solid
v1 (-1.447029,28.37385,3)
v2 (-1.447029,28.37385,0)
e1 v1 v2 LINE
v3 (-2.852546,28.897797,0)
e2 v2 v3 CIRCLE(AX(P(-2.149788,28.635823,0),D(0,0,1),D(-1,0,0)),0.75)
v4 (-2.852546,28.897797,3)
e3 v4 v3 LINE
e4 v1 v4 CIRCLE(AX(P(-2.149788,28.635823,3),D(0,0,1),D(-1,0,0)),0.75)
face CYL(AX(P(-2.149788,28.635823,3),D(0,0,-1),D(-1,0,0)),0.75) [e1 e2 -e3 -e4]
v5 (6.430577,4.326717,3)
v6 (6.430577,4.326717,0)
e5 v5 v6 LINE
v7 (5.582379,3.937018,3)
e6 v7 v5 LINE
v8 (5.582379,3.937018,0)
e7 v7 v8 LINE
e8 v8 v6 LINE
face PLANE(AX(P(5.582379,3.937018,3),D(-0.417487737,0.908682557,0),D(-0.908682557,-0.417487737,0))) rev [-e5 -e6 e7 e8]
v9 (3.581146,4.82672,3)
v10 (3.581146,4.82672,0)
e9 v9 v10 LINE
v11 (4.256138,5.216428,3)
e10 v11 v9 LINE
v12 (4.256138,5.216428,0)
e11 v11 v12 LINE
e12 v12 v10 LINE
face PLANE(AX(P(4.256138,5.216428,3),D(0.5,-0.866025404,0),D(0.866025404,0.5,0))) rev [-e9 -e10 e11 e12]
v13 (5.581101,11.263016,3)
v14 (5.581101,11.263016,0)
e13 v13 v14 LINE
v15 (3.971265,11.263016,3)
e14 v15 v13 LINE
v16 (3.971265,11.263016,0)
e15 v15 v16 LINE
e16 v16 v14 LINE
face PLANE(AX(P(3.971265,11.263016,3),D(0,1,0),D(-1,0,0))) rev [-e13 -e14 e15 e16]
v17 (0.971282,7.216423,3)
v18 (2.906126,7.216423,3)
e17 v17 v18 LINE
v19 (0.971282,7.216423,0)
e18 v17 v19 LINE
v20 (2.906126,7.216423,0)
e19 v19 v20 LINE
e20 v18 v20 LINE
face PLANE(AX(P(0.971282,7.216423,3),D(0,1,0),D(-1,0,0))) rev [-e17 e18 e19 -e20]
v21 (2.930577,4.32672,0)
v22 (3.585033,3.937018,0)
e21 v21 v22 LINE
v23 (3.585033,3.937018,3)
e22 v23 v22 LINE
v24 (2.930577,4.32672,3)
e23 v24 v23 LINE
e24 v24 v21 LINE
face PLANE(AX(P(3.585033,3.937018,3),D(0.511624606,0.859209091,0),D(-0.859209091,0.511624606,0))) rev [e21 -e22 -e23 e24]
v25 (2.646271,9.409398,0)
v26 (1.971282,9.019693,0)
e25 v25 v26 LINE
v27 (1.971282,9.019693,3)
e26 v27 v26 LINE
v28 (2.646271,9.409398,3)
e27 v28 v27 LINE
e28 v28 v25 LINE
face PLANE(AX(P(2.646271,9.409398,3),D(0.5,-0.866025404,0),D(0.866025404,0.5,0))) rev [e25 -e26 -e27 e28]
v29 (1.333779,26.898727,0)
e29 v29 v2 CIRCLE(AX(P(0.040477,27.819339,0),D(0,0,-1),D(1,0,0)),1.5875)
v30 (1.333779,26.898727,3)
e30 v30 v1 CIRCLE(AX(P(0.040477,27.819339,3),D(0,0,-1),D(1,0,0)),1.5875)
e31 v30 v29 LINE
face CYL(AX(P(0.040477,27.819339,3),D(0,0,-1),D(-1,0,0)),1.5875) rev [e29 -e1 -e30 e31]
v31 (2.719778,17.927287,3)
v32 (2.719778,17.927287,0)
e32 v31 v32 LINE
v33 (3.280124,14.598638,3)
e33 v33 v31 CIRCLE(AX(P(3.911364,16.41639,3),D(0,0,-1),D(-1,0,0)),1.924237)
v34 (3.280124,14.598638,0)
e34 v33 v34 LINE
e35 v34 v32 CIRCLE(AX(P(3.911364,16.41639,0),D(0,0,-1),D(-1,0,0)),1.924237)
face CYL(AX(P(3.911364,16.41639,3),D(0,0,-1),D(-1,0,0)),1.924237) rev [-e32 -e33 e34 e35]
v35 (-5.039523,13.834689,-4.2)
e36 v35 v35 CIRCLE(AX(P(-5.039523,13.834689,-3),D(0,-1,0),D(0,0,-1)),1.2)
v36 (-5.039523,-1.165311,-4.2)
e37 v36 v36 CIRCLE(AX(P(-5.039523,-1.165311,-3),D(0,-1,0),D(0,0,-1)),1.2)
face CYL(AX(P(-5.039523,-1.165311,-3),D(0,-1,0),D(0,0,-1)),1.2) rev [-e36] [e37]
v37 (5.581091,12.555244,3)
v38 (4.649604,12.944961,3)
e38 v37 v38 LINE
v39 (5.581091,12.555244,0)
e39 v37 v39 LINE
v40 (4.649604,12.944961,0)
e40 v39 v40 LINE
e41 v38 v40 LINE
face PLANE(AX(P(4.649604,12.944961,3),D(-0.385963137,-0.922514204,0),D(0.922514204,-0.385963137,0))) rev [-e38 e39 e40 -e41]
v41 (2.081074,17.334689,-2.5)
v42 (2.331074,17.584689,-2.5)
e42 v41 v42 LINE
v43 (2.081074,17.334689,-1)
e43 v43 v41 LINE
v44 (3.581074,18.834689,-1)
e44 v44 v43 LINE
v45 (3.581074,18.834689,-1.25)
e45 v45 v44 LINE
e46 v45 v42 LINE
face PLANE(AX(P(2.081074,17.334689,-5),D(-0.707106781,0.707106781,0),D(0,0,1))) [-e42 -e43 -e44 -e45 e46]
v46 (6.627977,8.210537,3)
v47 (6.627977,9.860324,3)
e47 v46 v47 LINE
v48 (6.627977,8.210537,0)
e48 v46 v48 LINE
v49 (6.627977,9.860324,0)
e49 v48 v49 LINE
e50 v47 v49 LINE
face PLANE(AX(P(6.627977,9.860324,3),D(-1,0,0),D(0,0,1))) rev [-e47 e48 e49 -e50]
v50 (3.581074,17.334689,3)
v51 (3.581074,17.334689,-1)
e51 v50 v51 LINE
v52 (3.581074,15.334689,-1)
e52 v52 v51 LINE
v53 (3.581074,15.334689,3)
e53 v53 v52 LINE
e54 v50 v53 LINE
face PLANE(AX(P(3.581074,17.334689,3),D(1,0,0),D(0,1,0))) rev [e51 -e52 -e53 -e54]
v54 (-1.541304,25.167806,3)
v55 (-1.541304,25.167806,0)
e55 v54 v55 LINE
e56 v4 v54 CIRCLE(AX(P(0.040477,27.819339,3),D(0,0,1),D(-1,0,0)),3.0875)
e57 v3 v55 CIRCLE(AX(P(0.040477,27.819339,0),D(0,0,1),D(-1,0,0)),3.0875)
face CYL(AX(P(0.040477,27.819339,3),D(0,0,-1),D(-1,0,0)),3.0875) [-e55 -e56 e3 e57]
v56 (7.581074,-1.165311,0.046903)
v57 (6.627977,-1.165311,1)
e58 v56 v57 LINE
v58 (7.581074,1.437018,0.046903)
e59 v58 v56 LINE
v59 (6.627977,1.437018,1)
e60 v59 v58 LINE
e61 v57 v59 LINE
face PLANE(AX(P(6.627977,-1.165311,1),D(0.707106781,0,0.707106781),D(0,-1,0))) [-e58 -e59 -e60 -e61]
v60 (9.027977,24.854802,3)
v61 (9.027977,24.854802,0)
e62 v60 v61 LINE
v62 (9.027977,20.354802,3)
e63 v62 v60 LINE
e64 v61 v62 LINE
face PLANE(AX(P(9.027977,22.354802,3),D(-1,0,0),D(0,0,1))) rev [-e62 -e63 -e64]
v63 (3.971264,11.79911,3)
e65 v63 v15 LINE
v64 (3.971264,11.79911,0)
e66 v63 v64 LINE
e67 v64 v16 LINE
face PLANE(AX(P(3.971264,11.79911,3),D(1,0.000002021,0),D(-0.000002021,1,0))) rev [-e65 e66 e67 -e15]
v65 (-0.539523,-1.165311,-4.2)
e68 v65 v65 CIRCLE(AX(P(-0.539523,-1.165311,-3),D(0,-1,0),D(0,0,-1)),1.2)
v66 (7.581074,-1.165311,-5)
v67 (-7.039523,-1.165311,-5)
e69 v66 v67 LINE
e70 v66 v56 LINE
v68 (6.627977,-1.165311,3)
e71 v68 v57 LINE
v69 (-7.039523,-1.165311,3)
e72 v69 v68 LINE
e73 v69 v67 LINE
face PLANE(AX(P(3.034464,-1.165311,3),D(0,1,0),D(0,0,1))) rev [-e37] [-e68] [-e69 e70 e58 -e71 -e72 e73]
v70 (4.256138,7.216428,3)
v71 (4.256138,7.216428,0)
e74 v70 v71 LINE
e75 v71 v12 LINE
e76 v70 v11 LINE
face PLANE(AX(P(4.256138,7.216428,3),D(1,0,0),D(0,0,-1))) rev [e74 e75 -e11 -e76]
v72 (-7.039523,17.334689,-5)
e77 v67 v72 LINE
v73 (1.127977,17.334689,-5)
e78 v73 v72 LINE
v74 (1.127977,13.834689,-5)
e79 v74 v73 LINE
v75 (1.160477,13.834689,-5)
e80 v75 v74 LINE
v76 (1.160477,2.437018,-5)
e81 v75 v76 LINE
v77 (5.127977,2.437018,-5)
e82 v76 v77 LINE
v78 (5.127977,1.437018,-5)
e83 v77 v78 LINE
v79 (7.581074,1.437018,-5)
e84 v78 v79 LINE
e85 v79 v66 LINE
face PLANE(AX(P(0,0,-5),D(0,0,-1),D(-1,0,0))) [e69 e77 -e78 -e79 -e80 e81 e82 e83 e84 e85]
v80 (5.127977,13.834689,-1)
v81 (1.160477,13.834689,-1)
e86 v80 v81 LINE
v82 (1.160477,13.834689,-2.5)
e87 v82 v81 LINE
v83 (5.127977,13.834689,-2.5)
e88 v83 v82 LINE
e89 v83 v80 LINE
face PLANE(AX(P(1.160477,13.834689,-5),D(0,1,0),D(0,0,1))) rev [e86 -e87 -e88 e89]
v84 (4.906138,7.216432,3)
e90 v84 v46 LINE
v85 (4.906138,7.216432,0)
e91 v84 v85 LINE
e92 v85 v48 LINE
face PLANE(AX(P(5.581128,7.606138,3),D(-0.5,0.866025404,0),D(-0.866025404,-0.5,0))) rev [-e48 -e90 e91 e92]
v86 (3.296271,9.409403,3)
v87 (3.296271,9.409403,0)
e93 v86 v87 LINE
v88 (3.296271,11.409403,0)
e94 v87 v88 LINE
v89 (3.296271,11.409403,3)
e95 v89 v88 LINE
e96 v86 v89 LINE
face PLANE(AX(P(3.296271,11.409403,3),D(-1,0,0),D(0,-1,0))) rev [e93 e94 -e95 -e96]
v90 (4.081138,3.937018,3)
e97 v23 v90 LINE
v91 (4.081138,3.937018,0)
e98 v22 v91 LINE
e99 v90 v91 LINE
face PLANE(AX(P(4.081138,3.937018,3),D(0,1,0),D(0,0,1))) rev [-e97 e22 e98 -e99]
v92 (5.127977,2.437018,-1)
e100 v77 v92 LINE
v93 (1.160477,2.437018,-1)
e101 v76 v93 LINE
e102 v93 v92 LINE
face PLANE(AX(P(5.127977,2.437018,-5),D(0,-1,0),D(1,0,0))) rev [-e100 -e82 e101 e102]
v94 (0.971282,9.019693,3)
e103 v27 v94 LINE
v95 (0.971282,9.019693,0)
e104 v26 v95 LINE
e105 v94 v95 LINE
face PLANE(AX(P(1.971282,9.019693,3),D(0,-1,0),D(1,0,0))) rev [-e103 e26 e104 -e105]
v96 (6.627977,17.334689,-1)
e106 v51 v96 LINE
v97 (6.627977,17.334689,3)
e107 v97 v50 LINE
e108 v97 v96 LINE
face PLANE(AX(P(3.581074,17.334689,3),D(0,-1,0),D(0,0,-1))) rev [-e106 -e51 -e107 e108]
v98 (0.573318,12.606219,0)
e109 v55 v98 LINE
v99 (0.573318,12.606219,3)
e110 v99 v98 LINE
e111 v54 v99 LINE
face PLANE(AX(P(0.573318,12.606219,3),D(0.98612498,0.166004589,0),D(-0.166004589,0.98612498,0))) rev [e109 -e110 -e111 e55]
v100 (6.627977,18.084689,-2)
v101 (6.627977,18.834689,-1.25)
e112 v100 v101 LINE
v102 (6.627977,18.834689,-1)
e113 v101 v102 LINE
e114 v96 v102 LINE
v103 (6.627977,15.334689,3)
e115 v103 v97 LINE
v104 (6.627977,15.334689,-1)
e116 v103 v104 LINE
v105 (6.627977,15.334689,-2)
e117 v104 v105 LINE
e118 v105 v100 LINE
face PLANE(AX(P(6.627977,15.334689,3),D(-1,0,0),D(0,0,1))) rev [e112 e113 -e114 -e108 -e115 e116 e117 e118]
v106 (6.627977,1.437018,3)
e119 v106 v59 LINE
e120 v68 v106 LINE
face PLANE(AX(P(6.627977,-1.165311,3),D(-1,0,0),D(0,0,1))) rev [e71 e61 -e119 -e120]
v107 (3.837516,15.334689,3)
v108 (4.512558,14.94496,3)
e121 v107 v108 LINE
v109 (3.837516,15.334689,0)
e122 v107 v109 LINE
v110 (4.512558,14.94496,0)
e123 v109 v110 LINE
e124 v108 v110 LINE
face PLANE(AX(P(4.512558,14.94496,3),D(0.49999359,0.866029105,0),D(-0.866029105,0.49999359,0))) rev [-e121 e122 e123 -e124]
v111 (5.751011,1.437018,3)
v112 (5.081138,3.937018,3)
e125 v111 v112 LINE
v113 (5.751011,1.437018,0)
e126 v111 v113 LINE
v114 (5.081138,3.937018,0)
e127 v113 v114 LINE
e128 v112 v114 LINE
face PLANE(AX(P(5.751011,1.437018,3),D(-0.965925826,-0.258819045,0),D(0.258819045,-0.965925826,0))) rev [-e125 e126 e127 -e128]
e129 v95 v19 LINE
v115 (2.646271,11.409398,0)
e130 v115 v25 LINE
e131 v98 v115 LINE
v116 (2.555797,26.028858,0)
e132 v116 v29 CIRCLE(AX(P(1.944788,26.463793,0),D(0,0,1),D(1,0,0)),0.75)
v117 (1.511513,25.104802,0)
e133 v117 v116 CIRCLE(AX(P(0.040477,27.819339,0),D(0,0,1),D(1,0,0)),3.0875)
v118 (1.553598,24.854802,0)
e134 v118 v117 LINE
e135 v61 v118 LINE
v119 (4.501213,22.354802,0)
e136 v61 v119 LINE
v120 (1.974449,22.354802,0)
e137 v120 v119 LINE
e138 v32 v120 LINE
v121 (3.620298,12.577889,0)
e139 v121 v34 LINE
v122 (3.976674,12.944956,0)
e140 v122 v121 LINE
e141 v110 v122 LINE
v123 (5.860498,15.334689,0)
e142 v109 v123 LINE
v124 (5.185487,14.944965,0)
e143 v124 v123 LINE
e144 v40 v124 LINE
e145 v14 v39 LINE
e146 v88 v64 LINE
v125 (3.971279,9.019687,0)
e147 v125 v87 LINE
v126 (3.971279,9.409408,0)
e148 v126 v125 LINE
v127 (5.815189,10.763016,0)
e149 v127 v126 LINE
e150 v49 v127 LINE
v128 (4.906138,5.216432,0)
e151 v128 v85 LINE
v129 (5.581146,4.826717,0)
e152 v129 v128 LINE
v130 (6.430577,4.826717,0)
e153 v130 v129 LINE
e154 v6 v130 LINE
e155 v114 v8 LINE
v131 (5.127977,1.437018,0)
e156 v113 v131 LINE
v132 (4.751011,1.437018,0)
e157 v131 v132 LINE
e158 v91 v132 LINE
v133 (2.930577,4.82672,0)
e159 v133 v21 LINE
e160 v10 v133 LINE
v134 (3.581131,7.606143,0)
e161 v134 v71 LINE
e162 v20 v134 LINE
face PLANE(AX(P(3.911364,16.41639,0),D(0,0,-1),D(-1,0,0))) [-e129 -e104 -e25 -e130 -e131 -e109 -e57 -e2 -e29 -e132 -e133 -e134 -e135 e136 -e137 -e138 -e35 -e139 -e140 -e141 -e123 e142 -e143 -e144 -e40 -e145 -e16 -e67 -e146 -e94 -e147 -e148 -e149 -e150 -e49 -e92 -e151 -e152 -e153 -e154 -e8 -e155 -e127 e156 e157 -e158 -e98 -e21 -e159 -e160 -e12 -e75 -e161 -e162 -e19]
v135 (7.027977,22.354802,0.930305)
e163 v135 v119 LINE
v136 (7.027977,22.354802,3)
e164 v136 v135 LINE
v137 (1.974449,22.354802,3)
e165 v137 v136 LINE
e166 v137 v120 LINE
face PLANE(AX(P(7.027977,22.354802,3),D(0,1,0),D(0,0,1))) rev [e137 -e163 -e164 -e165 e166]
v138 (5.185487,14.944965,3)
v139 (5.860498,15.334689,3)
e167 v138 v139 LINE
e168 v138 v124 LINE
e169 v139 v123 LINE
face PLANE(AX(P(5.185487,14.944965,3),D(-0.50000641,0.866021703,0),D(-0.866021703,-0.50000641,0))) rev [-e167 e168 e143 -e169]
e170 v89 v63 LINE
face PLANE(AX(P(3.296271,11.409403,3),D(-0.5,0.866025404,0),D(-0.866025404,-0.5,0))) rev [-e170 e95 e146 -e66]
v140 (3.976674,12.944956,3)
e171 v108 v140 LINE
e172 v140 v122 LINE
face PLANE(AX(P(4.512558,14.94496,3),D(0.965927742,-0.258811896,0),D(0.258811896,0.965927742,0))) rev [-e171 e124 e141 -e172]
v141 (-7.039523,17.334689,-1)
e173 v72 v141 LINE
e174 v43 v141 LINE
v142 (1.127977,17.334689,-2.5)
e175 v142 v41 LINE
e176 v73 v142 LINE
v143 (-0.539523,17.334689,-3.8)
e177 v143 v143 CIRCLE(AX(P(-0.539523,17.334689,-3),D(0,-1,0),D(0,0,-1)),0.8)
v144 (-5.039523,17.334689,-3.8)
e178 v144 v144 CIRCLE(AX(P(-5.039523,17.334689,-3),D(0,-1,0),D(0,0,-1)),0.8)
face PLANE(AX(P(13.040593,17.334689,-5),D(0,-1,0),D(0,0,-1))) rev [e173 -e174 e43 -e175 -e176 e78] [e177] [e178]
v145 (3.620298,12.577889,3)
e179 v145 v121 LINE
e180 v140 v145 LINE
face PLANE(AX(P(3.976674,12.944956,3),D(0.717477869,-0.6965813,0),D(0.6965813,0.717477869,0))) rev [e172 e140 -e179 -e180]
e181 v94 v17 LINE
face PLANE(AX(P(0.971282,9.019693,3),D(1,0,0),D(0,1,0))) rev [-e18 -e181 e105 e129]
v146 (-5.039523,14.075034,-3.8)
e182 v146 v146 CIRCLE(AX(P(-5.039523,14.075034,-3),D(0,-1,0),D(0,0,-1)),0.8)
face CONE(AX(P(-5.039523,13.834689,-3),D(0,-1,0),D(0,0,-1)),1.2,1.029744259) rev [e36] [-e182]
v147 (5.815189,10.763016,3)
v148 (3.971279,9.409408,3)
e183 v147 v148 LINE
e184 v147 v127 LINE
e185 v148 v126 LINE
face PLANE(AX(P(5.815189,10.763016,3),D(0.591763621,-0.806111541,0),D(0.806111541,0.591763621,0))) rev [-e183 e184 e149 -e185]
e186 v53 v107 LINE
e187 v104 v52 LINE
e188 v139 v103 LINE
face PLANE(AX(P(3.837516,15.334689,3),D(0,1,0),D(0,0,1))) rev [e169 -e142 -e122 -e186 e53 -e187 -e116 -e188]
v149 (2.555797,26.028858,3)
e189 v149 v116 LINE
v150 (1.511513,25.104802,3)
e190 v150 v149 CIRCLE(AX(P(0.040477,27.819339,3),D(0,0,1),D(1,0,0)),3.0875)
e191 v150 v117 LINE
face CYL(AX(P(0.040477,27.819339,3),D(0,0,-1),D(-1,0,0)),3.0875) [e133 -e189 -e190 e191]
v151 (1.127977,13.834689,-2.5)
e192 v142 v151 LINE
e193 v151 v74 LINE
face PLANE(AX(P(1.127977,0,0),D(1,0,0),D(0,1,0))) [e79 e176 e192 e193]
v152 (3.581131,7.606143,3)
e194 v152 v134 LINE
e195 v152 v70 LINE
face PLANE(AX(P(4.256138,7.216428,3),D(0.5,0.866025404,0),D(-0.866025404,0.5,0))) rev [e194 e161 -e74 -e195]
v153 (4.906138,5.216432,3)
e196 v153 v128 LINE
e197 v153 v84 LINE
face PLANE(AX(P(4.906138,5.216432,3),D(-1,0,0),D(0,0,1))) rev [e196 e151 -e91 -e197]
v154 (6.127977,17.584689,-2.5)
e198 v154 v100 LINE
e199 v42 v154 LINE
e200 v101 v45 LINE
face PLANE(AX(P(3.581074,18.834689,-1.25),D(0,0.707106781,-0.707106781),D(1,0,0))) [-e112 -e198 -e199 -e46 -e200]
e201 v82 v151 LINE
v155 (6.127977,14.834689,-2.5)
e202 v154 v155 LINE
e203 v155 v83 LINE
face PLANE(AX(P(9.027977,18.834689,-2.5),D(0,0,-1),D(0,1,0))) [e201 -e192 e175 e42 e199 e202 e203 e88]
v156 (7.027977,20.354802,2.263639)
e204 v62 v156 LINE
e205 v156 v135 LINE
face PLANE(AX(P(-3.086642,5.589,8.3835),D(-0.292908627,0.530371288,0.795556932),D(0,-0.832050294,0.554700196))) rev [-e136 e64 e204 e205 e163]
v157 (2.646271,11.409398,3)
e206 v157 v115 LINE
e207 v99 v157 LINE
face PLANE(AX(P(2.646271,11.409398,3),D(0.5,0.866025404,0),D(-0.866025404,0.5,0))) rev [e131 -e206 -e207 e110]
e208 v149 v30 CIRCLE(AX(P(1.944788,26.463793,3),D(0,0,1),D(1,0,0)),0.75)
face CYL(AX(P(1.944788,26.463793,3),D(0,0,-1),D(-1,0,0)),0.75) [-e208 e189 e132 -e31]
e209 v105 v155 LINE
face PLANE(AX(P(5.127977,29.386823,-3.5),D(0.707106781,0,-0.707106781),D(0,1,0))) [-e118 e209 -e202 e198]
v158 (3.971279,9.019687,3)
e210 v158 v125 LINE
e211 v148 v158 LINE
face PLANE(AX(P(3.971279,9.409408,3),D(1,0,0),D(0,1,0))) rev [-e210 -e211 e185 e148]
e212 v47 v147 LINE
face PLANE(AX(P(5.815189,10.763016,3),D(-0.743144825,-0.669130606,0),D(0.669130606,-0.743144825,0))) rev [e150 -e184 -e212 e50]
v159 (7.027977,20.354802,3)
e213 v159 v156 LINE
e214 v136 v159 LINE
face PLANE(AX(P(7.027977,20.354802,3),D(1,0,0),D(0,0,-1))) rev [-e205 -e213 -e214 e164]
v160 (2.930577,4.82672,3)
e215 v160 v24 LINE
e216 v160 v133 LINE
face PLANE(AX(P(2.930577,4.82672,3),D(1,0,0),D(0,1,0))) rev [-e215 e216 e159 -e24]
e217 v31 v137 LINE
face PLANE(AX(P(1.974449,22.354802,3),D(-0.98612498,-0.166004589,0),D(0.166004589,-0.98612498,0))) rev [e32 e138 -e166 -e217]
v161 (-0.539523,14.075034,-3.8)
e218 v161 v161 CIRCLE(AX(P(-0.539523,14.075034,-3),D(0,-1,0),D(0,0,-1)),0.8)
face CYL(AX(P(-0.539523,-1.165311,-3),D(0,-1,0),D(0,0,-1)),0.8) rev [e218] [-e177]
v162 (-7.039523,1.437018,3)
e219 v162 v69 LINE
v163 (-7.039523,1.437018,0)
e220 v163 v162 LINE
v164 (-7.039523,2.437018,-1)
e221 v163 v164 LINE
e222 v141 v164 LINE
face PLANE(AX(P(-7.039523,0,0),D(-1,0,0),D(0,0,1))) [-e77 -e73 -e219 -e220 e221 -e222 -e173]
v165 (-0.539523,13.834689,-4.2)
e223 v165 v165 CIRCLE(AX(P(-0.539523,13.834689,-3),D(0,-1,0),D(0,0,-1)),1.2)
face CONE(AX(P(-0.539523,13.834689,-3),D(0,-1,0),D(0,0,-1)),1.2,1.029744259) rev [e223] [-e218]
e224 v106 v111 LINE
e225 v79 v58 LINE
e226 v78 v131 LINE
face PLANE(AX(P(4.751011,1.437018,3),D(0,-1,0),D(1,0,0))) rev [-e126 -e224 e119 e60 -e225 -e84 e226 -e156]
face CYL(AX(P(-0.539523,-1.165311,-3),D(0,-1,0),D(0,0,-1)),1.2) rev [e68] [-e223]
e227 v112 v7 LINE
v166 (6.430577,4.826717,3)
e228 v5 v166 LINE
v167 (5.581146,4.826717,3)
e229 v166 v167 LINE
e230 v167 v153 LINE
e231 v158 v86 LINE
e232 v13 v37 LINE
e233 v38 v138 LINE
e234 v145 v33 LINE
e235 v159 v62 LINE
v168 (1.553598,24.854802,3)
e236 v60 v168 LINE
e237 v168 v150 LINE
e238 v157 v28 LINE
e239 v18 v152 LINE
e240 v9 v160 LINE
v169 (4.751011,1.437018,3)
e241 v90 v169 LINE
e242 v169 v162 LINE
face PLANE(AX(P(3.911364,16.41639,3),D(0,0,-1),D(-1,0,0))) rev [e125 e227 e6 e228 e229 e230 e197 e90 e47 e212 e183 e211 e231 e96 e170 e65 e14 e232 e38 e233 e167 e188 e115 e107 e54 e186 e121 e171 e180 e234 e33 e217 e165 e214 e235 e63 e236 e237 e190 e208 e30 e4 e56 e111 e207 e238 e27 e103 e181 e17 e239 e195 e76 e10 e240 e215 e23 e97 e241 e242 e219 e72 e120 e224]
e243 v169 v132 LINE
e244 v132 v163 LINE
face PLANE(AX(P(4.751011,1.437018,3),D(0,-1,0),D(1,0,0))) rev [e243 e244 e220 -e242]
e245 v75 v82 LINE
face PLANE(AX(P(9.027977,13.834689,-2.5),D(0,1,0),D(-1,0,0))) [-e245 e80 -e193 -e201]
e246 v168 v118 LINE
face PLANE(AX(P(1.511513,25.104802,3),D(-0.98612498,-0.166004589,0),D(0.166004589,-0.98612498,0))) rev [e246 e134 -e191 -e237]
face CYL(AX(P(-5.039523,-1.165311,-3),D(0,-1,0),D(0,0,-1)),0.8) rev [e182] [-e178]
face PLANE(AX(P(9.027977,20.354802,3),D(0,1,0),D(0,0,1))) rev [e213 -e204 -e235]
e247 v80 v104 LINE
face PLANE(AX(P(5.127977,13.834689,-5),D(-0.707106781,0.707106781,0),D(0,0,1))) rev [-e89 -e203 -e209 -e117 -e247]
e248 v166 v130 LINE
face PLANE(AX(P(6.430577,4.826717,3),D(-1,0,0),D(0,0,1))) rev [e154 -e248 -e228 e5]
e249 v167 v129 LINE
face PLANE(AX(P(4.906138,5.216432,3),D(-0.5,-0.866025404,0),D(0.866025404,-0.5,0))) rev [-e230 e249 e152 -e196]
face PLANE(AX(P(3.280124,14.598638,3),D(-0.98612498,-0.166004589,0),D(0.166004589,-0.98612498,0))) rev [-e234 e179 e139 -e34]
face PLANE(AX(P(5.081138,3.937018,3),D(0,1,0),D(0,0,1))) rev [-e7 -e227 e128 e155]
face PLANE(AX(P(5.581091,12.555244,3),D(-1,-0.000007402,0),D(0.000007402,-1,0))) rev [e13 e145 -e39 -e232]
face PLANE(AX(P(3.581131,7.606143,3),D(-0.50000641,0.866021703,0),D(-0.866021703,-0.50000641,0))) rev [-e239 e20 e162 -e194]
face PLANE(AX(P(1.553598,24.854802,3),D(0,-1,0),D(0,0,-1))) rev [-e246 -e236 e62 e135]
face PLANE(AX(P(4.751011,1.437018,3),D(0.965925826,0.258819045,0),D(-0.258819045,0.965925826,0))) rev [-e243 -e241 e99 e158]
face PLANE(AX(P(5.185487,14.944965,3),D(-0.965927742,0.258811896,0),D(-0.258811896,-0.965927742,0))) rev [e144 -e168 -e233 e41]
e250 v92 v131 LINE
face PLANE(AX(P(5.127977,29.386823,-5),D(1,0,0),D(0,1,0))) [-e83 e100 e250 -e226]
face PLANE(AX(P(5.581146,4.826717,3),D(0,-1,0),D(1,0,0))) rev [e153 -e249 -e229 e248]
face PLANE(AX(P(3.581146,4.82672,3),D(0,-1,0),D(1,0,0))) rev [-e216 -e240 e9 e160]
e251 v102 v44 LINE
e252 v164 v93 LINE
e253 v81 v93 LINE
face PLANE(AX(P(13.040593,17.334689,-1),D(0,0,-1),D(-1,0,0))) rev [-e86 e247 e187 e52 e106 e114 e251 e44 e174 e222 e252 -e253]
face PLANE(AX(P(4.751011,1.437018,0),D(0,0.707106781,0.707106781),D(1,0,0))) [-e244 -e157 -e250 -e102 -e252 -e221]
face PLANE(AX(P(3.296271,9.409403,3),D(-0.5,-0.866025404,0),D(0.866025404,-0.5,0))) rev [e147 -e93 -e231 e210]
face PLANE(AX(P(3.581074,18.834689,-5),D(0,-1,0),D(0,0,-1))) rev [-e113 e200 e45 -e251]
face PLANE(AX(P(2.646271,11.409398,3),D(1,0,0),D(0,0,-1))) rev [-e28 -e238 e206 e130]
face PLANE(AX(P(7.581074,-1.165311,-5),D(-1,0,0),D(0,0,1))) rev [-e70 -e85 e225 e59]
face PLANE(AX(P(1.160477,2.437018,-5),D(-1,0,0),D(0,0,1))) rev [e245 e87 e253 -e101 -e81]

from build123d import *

# Parameters (mm, degrees)
BOSS_SWITCH_BODY_DEPTH                    = 3
SKETCH1_W                                 = 4
SKETCH1_H                                 = 3.5
BOSS_FLANGE_WIDTH_DEPTH                   = 5
BOSS_FLANGE_HEIGHT_REACH                  = 35.863
SKETCH2_W                                 = 4
SKETCH2_H                                 = 2
SKETCH2_W_2                               = 8
SKETCH2_H_2                               = 2.602328973
CUT_UP_TO_DOWN_DERAILLEUR_CLEARANCE_REACH = 21.462
SKETCH10_W                                = 2.453096586
SKETCH10_H                                = 3
SKETCH17_W                                = 12.1675
SKETCH17_H                                = 4
BOSS_FLANGE_SUPPORT_DEPTH                 = 13.897671027
TAP_DRILL_FOR_M2X0_4_TAP1_D               = 1.6
M2_CLEARANCE_HOLE2_D                      = 2.4
M2_CLEARANCE_HOLE2_DEPTH                  = 15
M2_CLEARANCE_HOLE2_TIP                    = 0.721032743
CHAMFER_FLANGE_SUPPORT_SIZE               = 1.5
CHAMFER_FLANGE_SUPPORT_2_SIZE             = 1.5
CHAMFER_FLANGE_SUPPORT_3_SIZE             = 1
SKETCH23_W                                = 3.9675
SKETCH23_H                                = 11.397671027
CUT_GAP_FOR_PRINTING_DEPTH                = 32.000499688
SKETCH25_W                                = 0.953096586
SKETCH25_H                                = 3.5
CUT_DERAILLEUR_CLEARANCE_DEPTH            = 32.145320369
CHAMFER8_SIZE                             = 1
CUT_UP_TO_DOWN_CANTILEVER_SLOPE_REACH     = 31.869
SKETCH26_W                                = 12.477246204
SKETCH26_H                                = 5.771077126
CUT_WIDE_DERAILLEUR_CLEARANCE_DEPTH       = 33.195879702
CUT_WIDE_DERAILLEUR_CLEARANCE_DEPTH_BACK  = 4
SKETCH27_W                                = 2.5
SKETCH27_H                                = 5.000000046
CHAMFER9_SIZE                             = 1.25
SKETCH28_W                                = 3.046903414
SKETCH28_H                                = 1.5
CUT_EXTRUDE1_DEPTH                        = 1


# Some blends are built 0.0001 mm under size
with BuildPart() as part:
    # Sketch-SwitchBossUp → Boss-Switch Body (new body)
    with BuildSketch(Plane.XY):
        with BuildLine():
            Line((5.581091201, 12.55524379), (5.581100766, 11.263016279))
            Line((5.581100766, 11.263016279), (3.971265023, 11.263016279))
            Line((3.971265023, 11.263016279), (3.97126394, 11.79911022))
            Line((3.97126394, 11.79911022), (3.296271341, 11.409403061))
            Line((3.296271341, 11.409403061), (3.296271341, 9.409403061))
            Line((3.296271341, 9.409403061), (3.971278743, 9.019687356))
            Line((3.971278743, 9.019687356), (3.971278743, 9.409408058))
            Line((3.971278743, 9.409408058), (5.815189336, 10.763016279))
            Line((5.815189336, 10.763016279), (6.627976927, 9.860324207))
            Line((6.627976927, 9.860324207), (6.627976927, 8.210536505))
            Line((6.627976927, 8.210536505), (5.581127833, 7.606137899))
            Line((5.581127833, 7.606137899), (4.906138119, 7.216432406))
            Line((4.906138119, 7.216432406), (4.906138119, 5.216432406))
            Line((4.906138119, 5.216432406), (5.58114552, 4.826716701))
            Line((5.58114552, 4.826716701), (6.430577026, 4.826716701))
            Line((6.430577026, 4.826716701), (6.430577026, 4.326716701))
            Line((6.430577026, 4.326716701), (5.582379266, 3.937018274))
            Line((5.582379266, 3.937018274), (5.081138119, 3.937018274))
            Line((5.081138119, 3.937018274), (5.7510111, 1.437018274))
            Line((5.7510111, 1.437018274), (6.627976927, 1.437018274))
            Line((6.627976927, 1.437018274), (6.627976927, -1.165310699))
            Line((6.627976927, -1.165310699), (3.034464198, -1.165310699))
            Line((3.034464198, -1.165310699), (3.034464198, 1.437018274))
            Line((3.034464198, 1.437018274), (4.7510111, 1.437018274))
            Line((4.7510111, 1.437018274), (4.081138119, 3.937018274))
            Line((4.081138119, 3.937018274), (3.585032728, 3.937018274))
            Line((3.585032728, 3.937018274), (2.930577026, 4.326720436))
            Line((2.930577026, 4.326720436), (2.930577026, 4.826720436))
            Line((2.930577026, 4.826720436), (3.58114552, 4.826720436))
            Line((3.58114552, 4.826720436), (4.256138119, 5.216427595))
            Line((4.256138119, 5.216427595), (4.256138119, 7.216427595))
            Line((4.256138119, 7.216427595), (3.581130717, 7.6061433))
            Line((3.581130717, 7.6061433), (2.9061262, 7.216422599))
            Line((2.9061262, 7.216422599), (0.971281627, 7.216422599))
            Line((0.971281627, 7.216422599), (0.971281627, 9.019692757))
            Line((0.971281627, 9.019692757), (1.971281627, 9.019692757))
            Line((1.971281627, 9.019692757), (2.646271341, 9.40939825))
            Line((2.646271341, 9.40939825), (2.646271341, 11.40939825))
            Line((2.646271341, 11.40939825), (1.696557212, 11.957715958))
            Line((1.696557212, 11.957715958), (0.573317845, 12.60621851))
            Line((0.573317845, 12.60621851), (-1.541303694, 25.167805745))
            ThreePointArc((-1.541303694, 25.167805745), (-2.872284003, 26.795385437), (-2.852546321, 28.897797067))
            ThreePointArc((-2.852546321, 28.897797067), (-1.887813913, 29.338582026), (-1.447028953, 28.373849618))
            ThreePointArc((-1.447028953, 28.373849618), (-0.703448682, 26.416936722), (1.333779254, 26.898727173))
            ThreePointArc((1.333779254, 26.898727173), (2.379722745, 27.074801628), (2.555797201, 26.028858137))
            ThreePointArc((2.555797201, 26.028858137), (2.086504637, 25.507104397), (1.511513111, 25.104801997))
            Line((1.511513111, 25.104801997), (1.553598189, 24.854801997))
            Line((1.553598189, 24.854801997), (9.027976927, 24.854801997))
            Line((9.027976927, 24.854801997), (9.027976927, 22.354801997))
            Line((9.027976927, 22.354801997), (9.027976927, 20.354801997))
            Line((9.027976927, 20.354801997), (7.027976927, 20.354801997))
            Line((7.027976927, 20.354801997), (7.027976927, 22.354801997))
            Line((7.027976927, 22.354801997), (1.974448974, 22.354801997))
            Line((1.974448974, 22.354801997), (2.719778232, 17.927287042))
            ThreePointArc((2.719778232, 17.927287042), (2.013826204, 16.096957693), (3.280124137, 14.598637521))
            Line((3.280124137, 14.598637521), (3.620297651, 12.577888564))
            Line((3.620297651, 12.577888564), (3.976674365, 12.944956135))
            Line((3.976674365, 12.944956135), (4.512557947, 14.944960101))
            Line((4.512557947, 14.944960101), (3.837515632, 15.334689301))
            Line((3.837515632, 15.334689301), (3.581073513, 15.334689301))
            Line((3.581073513, 15.334689301), (3.581073513, 17.334689301))
            Line((3.581073513, 17.334689301), (5.725580434, 17.334689301))
            Line((5.725580434, 17.334689301), (6.627976927, 17.334689301))
            Line((6.627976927, 17.334689301), (6.627976927, 15.334689301))
            Line((6.627976927, 15.334689301), (5.860498075, 15.334689301))
            Line((5.860498075, 15.334689301), (5.185487464, 14.944965082))
            Line((5.185487464, 14.944965082), (4.649603883, 12.944961115))
            Line((4.649603883, 12.944961115), (5.581091201, 12.55524379))
        make_face()
    extrude(amount=BOSS_SWITCH_BODY_DEPTH)

    # Sketch1 → Boss-Flange Width (add)
    with BuildSketch(Plane(origin=(0, 0, 0), x_dir=(-1, 0, 0), z_dir=(0, 0, -1))):
        Polygon((-7.581073513, -1.165310699), (0.412170615, -1.165310699), (0.412170615, 1.437018274), (-3.034464198, 1.437018274), (-4.7510111, 1.437018274), (-5.7510111, 1.437018274), (-6.627976927, 1.437018274), (-7.581073513, 1.437018274), align=None)
        with Locations((-5.581073513, 17.084689301)):
            Rectangle(SKETCH1_W, SKETCH1_H)
    extrude(amount=BOSS_FLANGE_WIDTH_DEPTH)

    # Sketch2 → Boss-Flange Height (add, up to next)
    with BuildSketch(Plane(origin=(-7.039523073, 0, 0), x_dir=(0, 0, -1), z_dir=(1, 0, 0)), mode=Mode.PRIVATE) as boss_flange_height_sk1:
        with Locations((3, 16.334689301)):
            Rectangle(SKETCH2_W, SKETCH2_H)
    boss_flange_height_tool1 = extrude(boss_flange_height_sk1.sketch, amount=BOSS_FLANGE_HEIGHT_REACH, mode=Mode.PRIVATE) - part.part
    # Sketch2 → Boss-Flange Height (add, up to next)
    with BuildSketch(Plane(origin=(-7.039523073, 0, 0), x_dir=(0, 0, -1), z_dir=(1, 0, 0)), mode=Mode.PRIVATE) as boss_flange_height_sk2:
        with Locations((1, 0.135853787)):
            Rectangle(SKETCH2_W_2, SKETCH2_H_2)
    boss_flange_height_tool2 = extrude(boss_flange_height_sk2.sketch, amount=BOSS_FLANGE_HEIGHT_REACH, mode=Mode.PRIVATE) - part.part
    add(boss_flange_height_tool1.solids().sort_by_distance((-7.039523, 16.334689, -3))[0])
    add(boss_flange_height_tool2.solids().sort_by_distance((-7.039523, 0.135854, -1))[0])

    # Sketch10 → Cut-Up-To-Down Derailleur Clearance (cut, up to next)
    with BuildSketch(Plane(origin=(0, 15.334689301, 0), x_dir=(1, 0, 0), z_dir=(0, 1, 0)), mode=Mode.PRIVATE) as cut_up_to_down_derailleur_clearance_sk1:
        with Locations((6.35452522, 3.5)):
            Rectangle(SKETCH10_W, SKETCH10_H)
    cut_up_to_down_derailleur_clearance_tool1 = extrude(cut_up_to_down_derailleur_clearance_sk1.sketch, amount=CUT_UP_TO_DOWN_DERAILLEUR_CLEARANCE_REACH, mode=Mode.PRIVATE) & part.part
    add(cut_up_to_down_derailleur_clearance_tool1.solids().sort_by_distance((6.354525, 15.334689, -3.5))[0], mode=Mode.SUBTRACT)

    # Sketch17 → Boss-Flange Support (add)
    with BuildSketch(Plane.XZ.offset(-15.334689301)):
        with Locations((-0.955773073, -3)):
            Rectangle(SKETCH17_W, SKETCH17_H)
    extrude(amount=BOSS_FLANGE_SUPPORT_DEPTH)

    # Tap Drill for M2x0.4 Tap1 (through all)
    with Locations(Plane(origin=(0, -1.165310699, 0), x_dir=(-1, 0, 0), z_dir=(0, -1, 0))):
        with Locations((5.039523073, 3), (0.539523073, 3)):
            Hole(TAP_DRILL_FOR_M2X0_4_TAP1_D / 2)

    # M2 Clearance Hole2
    with Locations(Plane.XZ.offset(1.165310699)):
        with Locations((-5.039523073, -3), (-0.539523073, -3)):
            Hole(M2_CLEARANCE_HOLE2_D / 2, depth=M2_CLEARANCE_HOLE2_DEPTH)
            with Locations((0, 0, -(M2_CLEARANCE_HOLE2_DEPTH + M2_CLEARANCE_HOLE2_TIP / 2))):  # 118° drill point
                Cone(0, M2_CLEARANCE_HOLE2_D / 2, M2_CLEARANCE_HOLE2_TIP, mode=Mode.SUBTRACT)

    # Chamfer-Flange Support
    chamfer_flange_support_edges = [part.edges().sort_by_distance(p)[0] for p in [
        (3.581073513, 17.334689301, -3),
    ]]
    chamfer(chamfer_flange_support_edges, length=CHAMFER_FLANGE_SUPPORT_SIZE - 0.0001)  # a hair under: the kernel refuses the full size

    # Chamfer-Flange Support 2
    chamfer_flange_support_2_edges = [part.edges().sort_by_distance(p)[0] for p in [
        (5.127976927, 17.084689301, -2),
        (5.127976927, 15.334689301, -1.5),
    ]]
    chamfer(chamfer_flange_support_2_edges, length=CHAMFER_FLANGE_SUPPORT_2_SIZE)

    # Chamfer-Flange Support 3
    chamfer_flange_support_3_edges = [part.edges().sort_by_distance(p)[0] for p in [
        (-0.955773073, 1.437018274, -1),
    ]]
    chamfer(chamfer_flange_support_3_edges, length=CHAMFER_FLANGE_SUPPORT_3_SIZE - 0.0001)  # a hair under: the kernel refuses the full size

    # Sketch23 → Cut-Gap for Printing (cut, through all)
    with BuildSketch(Plane.XY.offset(-1)):
        with Locations((3.144226927, 8.135853788)):
            Rectangle(SKETCH23_W, SKETCH23_H)
    extrude(amount=-CUT_GAP_FOR_PRINTING_DEPTH, mode=Mode.SUBTRACT)

    # Sketch25 → Cut-Derailleur Clearance (cut, through all)
    with BuildSketch(Plane.XY):
        with Locations((7.10452522, 17.084689301)):
            Rectangle(SKETCH25_W, SKETCH25_H)
    extrude(amount=-CUT_DERAILLEUR_CLEARANCE_DEPTH, mode=Mode.SUBTRACT)

    # Chamfer8
    # the kernel refuses this chamfer: 1 mm, written as the material it adds along each edge
    with BuildSketch(Plane(origin=(6.627976927, 1.437018274, 0), x_dir=(0.9996219169112968, 0, -0.027495876610586365), z_dir=(0, -1, 0))) as chamfer8_piece_1_section:
        Polygon((CHAMFER8_SIZE * 0.999621916911, CHAMFER8_SIZE * 0.0274958766106), (-CHAMFER8_SIZE * 0.0274958766106, CHAMFER8_SIZE * 0.999621916911), (0, 0), align=None)
    chamfer8_piece_1 = extrude(amount=2.602328973, mode=Mode.PRIVATE)
    chamfer8_piece_1 = split(chamfer8_piece_1, bisect_by=Plane(origin=(7.581073513, 0.135853788, 0.332375145), z_dir=(-1, 0, 0)), keep=Keep.TOP, mode=Mode.PRIVATE)
    add(chamfer8_piece_1)

    # Sketch26 → Cut-Up-to-Down Cantilever Slope (cut, up to next)
    with BuildSketch(Plane(origin=(-3.086642121, 5.589000146, 8.383500218), x_dir=(-0.9561404375276108, -0.1624764728289173, -0.24371470924337582), z_dir=(0.2929086269205964, -0.5303712883154423, -0.795556932473163)), mode=Mode.PRIVATE) as cut_up_to_down_cantilever_slope_sk1:
        with Locations((-13.791615152, 17.794906754)):
            Rectangle(SKETCH26_W, SKETCH26_H)
    cut_up_to_down_cantilever_slope_tool1 = extrude(cut_up_to_down_cantilever_slope_sk1.sketch, amount=CUT_UP_TO_DOWN_CANTILEVER_SLOPE_REACH, mode=Mode.PRIVATE) & part.part
    add(cut_up_to_down_cantilever_slope_tool1.solids().sort_by_distance((10.100079, 22.636071, 1.873881))[0], mode=Mode.SUBTRACT)

    # Sketch27 → Cut-Wide Derailleur Clearance (cut, two sides: drawn at the far end of the back side and taken through both)
    with BuildSketch(Plane(origin=(5.127976927, 0, 0), x_dir=(0, 0, -1), z_dir=(1, 0, 0)).offset(-CUT_WIDE_DERAILLEUR_CLEARANCE_DEPTH_BACK)):
        with Locations((3.75, 16.334689324)):
            Rectangle(SKETCH27_W, SKETCH27_H)
    extrude(amount=CUT_WIDE_DERAILLEUR_CLEARANCE_DEPTH + CUT_WIDE_DERAILLEUR_CLEARANCE_DEPTH_BACK, mode=Mode.SUBTRACT)

    # Chamfer9
    chamfer9_edges = [part.edges().sort_by_distance(p)[0] for p in [
        (4.85452522, 18.834689347, -2.5),
    ]]
    chamfer(chamfer9_edges, length=CHAMFER9_SIZE)

    # Sketch28 → Cut-Extrude1 (cut)
    with BuildSketch(Plane.XY.offset(-1)):
        with Locations((5.10452522, 18.084689301)):
            Rectangle(SKETCH28_W, SKETCH28_H)
    extrude(amount=CUT_EXTRUDE1_DEPTH, mode=Mode.SUBTRACT)


solid = part.part
